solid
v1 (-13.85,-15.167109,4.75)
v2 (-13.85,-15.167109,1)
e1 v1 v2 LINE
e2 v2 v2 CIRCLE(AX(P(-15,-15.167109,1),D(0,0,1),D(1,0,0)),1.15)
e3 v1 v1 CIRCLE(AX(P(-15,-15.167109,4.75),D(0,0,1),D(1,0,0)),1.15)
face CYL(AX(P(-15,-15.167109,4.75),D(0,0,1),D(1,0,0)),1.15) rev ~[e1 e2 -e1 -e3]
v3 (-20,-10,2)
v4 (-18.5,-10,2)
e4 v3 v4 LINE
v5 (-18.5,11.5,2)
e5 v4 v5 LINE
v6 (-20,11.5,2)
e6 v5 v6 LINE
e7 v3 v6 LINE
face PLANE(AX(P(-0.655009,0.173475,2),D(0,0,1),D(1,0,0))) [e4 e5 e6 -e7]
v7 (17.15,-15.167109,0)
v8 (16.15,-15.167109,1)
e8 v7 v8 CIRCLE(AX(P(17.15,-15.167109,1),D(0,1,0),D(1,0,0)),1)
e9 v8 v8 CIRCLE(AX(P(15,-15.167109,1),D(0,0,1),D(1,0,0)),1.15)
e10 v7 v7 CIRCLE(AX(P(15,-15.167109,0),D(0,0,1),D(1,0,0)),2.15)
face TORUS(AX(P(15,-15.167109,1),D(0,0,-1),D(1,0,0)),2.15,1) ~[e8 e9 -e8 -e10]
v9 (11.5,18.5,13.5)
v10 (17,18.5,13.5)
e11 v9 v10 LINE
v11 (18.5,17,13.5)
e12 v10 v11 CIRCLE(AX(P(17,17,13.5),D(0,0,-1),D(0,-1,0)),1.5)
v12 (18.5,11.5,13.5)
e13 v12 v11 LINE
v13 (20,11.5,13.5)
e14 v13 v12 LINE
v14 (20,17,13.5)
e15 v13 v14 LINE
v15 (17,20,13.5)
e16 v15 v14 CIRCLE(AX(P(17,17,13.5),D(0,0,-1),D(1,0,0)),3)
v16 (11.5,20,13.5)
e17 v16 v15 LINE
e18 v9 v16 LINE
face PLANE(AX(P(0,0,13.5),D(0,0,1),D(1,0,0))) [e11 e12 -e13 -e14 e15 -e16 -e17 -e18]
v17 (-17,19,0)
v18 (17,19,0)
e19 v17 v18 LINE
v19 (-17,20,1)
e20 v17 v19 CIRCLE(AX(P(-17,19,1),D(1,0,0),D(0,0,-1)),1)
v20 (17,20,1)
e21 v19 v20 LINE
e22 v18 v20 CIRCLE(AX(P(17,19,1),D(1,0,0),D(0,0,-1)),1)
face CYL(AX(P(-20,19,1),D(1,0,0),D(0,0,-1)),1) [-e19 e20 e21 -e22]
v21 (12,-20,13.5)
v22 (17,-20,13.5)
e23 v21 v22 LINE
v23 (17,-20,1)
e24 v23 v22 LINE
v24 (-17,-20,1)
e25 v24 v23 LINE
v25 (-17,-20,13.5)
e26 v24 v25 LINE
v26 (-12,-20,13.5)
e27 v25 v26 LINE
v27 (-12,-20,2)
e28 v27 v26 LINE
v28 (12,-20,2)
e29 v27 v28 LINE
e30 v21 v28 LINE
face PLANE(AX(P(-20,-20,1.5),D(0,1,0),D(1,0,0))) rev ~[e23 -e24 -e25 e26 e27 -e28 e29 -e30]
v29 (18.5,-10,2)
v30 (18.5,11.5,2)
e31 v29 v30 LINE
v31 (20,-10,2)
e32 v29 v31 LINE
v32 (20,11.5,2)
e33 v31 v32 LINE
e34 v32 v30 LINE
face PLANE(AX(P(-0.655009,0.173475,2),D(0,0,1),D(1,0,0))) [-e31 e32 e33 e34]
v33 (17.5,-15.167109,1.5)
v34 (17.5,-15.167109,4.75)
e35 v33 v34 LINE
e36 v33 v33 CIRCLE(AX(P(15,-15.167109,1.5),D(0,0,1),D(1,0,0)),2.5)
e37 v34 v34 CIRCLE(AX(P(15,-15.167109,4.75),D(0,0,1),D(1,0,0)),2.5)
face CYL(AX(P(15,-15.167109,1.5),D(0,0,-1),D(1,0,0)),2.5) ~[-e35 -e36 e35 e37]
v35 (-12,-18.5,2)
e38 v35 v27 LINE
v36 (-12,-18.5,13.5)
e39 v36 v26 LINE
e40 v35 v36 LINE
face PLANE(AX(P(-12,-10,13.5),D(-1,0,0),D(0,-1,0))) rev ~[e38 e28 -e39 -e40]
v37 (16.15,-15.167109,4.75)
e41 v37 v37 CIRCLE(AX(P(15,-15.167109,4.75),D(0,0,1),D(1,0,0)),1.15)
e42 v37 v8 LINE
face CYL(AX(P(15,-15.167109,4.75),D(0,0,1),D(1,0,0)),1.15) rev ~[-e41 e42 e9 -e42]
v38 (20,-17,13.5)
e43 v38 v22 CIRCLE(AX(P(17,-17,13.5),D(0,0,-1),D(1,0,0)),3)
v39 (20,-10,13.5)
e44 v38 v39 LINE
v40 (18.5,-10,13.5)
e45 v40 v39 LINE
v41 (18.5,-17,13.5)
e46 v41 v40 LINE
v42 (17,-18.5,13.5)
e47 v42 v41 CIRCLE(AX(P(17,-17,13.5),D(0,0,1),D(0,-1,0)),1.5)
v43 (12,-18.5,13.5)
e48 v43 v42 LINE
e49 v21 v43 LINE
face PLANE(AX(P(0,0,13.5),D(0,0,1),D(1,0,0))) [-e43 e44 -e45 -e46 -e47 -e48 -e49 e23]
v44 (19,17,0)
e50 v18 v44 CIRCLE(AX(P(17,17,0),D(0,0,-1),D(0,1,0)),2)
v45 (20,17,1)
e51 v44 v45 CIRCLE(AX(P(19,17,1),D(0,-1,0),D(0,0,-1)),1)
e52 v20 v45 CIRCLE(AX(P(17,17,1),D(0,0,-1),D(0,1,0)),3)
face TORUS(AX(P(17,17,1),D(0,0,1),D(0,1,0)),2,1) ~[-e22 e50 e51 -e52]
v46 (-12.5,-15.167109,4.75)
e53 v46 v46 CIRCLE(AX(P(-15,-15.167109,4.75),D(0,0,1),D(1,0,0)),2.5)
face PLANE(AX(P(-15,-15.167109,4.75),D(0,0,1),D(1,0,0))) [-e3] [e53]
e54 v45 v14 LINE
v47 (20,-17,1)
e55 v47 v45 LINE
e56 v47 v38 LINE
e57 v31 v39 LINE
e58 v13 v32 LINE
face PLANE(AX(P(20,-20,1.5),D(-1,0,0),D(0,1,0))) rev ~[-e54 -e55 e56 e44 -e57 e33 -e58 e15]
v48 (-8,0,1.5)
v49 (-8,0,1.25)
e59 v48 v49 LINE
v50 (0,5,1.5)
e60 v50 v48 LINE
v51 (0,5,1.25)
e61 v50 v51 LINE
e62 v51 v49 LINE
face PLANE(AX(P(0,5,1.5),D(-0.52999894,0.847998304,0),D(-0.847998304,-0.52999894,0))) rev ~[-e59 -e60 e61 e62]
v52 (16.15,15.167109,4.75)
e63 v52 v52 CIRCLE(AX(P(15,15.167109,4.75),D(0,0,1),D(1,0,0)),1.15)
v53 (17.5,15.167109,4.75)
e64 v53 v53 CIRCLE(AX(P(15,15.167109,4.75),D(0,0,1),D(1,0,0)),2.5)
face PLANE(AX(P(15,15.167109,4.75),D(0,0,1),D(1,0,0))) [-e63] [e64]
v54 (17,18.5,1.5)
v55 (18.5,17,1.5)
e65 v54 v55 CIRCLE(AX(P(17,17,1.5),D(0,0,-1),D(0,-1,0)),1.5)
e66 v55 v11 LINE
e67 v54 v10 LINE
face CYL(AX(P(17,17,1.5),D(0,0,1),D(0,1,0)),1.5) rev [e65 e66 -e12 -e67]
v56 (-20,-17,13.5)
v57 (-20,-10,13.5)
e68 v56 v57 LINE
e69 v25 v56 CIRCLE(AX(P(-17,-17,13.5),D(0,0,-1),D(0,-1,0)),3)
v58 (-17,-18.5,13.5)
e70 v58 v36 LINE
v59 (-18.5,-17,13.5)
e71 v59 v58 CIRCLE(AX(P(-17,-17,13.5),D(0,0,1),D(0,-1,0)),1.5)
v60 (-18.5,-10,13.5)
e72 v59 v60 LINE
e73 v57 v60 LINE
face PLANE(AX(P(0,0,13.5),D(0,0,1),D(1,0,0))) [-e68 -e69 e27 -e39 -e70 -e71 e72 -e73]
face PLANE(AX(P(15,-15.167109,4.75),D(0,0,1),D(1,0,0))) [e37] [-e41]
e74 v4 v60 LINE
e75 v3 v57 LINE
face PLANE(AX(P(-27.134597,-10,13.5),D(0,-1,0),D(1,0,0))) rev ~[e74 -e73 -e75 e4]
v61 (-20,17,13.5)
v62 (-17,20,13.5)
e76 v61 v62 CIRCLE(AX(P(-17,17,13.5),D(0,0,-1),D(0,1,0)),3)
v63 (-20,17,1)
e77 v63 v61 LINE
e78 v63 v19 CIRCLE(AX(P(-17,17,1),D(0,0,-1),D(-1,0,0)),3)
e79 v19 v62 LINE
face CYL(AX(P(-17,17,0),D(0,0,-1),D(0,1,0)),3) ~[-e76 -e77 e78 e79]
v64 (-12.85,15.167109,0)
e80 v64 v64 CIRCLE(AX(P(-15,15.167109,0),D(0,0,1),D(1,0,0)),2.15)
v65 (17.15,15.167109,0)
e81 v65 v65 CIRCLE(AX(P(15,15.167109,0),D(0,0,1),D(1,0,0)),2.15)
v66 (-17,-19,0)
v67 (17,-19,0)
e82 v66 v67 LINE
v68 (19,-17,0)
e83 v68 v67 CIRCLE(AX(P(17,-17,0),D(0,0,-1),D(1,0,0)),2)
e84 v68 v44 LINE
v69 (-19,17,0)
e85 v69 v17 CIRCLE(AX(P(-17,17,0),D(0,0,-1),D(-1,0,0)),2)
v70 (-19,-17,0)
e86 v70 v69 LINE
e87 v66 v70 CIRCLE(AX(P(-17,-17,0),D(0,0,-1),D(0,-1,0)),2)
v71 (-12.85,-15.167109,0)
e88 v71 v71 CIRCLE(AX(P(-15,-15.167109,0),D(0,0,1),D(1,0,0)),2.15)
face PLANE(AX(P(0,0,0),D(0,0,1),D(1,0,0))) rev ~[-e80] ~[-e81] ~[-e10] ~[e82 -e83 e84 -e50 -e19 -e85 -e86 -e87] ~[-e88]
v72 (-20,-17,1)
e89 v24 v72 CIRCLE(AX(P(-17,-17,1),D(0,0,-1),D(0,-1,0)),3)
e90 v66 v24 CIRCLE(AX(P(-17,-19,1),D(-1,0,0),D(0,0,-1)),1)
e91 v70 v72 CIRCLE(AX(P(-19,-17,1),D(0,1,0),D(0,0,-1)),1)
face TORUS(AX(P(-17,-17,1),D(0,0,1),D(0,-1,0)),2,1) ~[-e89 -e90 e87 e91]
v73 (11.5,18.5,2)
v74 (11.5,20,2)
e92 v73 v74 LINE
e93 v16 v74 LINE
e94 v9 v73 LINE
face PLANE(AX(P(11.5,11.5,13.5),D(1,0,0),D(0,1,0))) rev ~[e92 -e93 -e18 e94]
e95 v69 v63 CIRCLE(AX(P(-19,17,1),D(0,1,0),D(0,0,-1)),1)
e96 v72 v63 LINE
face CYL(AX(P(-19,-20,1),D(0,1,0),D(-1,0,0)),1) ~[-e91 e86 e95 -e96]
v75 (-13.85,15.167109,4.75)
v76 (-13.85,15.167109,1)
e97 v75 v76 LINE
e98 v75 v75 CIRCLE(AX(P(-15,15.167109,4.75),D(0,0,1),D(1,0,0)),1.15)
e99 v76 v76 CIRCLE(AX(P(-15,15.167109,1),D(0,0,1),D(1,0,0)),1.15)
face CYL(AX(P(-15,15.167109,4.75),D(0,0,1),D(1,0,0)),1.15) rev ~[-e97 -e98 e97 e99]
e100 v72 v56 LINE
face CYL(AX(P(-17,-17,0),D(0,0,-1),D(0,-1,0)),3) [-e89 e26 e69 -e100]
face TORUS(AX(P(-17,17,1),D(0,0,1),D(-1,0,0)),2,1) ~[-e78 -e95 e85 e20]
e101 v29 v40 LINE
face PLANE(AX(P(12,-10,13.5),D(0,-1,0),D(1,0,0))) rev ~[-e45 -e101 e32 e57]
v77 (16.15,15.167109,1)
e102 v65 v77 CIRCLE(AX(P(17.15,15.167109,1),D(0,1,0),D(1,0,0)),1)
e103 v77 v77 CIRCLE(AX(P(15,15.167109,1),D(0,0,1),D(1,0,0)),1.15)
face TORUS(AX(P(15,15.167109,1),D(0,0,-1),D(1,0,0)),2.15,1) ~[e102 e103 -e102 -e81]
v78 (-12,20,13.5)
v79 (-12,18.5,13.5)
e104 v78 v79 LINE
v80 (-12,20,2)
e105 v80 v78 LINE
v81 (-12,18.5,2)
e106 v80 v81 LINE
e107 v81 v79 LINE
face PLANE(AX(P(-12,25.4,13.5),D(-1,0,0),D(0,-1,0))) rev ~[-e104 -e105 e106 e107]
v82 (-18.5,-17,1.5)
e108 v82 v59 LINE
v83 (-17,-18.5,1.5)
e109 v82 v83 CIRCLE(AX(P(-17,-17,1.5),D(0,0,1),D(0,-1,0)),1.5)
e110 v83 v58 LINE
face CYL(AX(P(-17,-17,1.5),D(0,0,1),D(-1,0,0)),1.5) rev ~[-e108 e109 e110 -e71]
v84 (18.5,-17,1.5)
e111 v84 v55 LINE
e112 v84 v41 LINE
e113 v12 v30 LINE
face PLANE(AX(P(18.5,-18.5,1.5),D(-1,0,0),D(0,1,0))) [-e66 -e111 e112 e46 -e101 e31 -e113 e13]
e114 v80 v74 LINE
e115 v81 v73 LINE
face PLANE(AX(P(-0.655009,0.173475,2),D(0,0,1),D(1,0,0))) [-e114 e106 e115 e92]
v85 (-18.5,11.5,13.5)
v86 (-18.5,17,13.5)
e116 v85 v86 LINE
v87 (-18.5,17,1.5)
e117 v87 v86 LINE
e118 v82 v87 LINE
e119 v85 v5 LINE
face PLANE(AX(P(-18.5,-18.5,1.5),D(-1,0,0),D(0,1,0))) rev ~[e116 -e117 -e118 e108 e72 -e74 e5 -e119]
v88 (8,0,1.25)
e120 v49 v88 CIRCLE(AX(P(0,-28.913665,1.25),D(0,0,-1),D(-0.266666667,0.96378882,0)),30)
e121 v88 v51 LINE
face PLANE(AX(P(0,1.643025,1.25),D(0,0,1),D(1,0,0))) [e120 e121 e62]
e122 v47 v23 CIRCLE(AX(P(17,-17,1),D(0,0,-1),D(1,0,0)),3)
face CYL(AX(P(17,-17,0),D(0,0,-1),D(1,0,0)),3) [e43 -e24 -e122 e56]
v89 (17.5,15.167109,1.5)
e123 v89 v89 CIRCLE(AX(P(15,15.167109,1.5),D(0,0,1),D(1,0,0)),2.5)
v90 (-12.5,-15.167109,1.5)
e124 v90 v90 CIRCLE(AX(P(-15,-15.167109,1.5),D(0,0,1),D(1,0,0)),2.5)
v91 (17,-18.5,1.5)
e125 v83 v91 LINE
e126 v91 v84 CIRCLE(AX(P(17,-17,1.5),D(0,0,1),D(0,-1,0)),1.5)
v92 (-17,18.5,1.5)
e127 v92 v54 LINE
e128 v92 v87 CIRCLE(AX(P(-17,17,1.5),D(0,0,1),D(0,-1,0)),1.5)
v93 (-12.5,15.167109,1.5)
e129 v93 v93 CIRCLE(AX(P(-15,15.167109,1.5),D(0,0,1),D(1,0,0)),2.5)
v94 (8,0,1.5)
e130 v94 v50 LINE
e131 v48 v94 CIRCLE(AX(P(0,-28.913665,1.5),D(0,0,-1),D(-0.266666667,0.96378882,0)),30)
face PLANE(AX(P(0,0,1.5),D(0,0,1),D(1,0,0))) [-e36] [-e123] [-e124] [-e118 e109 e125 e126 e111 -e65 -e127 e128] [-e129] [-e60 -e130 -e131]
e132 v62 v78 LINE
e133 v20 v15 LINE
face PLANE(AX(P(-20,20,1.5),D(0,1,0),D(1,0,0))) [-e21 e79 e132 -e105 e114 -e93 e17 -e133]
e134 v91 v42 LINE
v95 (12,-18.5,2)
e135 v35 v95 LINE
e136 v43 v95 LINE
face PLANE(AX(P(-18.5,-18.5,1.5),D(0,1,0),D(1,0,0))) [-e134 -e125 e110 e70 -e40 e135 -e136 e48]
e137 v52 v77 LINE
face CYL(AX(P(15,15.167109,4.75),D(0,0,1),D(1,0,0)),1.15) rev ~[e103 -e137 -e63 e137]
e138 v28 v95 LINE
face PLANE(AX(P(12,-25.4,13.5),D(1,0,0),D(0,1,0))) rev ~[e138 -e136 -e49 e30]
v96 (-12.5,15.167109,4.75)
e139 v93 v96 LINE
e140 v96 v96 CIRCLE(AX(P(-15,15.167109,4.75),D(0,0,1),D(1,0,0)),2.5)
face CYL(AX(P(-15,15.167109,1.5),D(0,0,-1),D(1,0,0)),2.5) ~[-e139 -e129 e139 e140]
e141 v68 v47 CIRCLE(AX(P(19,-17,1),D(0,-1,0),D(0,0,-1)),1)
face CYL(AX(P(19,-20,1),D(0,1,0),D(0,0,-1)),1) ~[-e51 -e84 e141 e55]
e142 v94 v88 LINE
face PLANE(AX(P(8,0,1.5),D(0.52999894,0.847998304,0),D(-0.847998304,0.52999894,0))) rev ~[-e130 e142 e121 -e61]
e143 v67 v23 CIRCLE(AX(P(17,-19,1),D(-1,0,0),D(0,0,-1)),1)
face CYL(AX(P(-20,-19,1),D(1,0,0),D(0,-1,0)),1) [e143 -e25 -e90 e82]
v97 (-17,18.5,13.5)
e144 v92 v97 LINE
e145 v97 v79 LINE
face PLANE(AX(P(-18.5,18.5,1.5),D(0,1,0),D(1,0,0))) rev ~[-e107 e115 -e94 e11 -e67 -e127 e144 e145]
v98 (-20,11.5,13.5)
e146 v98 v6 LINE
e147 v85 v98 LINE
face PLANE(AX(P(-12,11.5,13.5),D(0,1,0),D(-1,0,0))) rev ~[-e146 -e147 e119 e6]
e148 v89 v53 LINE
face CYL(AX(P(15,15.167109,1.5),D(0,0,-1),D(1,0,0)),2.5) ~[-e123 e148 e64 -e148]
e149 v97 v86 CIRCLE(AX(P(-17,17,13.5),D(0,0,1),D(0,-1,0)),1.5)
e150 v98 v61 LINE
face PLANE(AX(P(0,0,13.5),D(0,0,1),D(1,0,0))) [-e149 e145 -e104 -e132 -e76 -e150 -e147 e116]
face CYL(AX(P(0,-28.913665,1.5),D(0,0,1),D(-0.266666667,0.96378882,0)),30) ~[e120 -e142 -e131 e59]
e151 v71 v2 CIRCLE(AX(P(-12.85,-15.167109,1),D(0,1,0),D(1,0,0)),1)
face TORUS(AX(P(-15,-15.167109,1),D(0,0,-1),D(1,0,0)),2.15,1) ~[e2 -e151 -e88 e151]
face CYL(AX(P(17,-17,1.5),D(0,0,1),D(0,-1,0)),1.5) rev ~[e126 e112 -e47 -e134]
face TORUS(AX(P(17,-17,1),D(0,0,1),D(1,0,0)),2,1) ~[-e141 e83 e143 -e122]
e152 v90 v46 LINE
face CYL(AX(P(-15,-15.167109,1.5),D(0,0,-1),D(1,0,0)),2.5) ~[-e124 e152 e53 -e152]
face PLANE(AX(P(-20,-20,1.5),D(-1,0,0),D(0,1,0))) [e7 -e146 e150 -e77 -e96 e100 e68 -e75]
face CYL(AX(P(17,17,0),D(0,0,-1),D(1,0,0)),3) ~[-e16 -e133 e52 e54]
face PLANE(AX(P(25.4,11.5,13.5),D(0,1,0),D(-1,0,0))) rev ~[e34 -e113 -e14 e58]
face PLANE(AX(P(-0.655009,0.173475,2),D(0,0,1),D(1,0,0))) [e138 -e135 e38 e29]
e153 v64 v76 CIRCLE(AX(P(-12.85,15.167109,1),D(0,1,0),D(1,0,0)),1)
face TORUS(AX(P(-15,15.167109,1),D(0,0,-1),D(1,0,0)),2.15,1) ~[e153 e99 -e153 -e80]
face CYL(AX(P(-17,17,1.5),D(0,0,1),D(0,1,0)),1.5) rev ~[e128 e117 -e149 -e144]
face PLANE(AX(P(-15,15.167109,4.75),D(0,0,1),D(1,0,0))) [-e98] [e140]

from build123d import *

# Parameters (mm, degrees)
F0_W          = 40
F0_H          = 40
F1_DEPTH      = 1.5
F2_W          = 40
F2_H          = 40
F2_W_2        = 37
F2_H_2        = 37
F3_DEPTH      = 12
F4_R          = 2.5
F5_DEPTH      = 3.25
F6_R          = 1.15
F7_DEPTH      = 4.751
F9_DEPTH      = 11.5
F11_DEPTH     = 0.25
F12_R         = 1
F13_T1_DEPTH  = 21
F13_T4_ANGLE  = 90
F13_T6_ANGLE  = 90
F13_T8_ANGLE  = 90
F13_T10_ANGLE = 90
F14_R         = 1.5


# Not quite as in the source:
# - a fillet or chamfer that OpenCascade refuses, or shapes differently, is made with other operations: its cross-section is extruded or revolved along the edge and cut away or added


with BuildPart() as f1:
    # F0 (on Top) → F1 (new body)
    with BuildSketch(Plane.XY):
        Rectangle(F0_W, F0_H)
    extrude(amount=F1_DEPTH)

    # F2 (on face) → F3 (join)
    with BuildSketch(Plane.XY.offset(1.5)):
        Rectangle(F2_W, F2_H)
        Rectangle(F2_W_2, F2_H_2, mode=Mode.SUBTRACT)
    extrude(amount=F3_DEPTH)

    # F4 (on face) → F5 (join)
    with BuildSketch(Plane.XY.offset(1.5)):
        with Locations((-15, 15.1671093126)):
            Circle(F4_R)
        with Locations((15, 15.1671093126)):
            Circle(F4_R)
        with Locations((15, -15.1671093126)):
            Circle(F4_R)
        with Locations((-15, -15.1671093126)):
            Circle(F4_R)
    extrude(amount=F5_DEPTH)

    # F6 (on face) → F7 (cut, through all)
    with BuildSketch(Plane.XY.offset(4.75)):
        with Locations((-15, 15.1671093126)):
            Circle(F6_R)
        with Locations((15, 15.1671093126)):
            Circle(F6_R)
        with Locations((-15, -15.1671093126)):
            Circle(F6_R)
        with Locations((15, -15.1671093126)):
            Circle(F6_R)
    extrude(amount=-F7_DEPTH, mode=Mode.SUBTRACT)

    # F8 (on face) → F9 (cut)
    with BuildSketch(Plane.XY.offset(13.5)):
        Polygon((11.5, 25.4), (-12, 25.4), (-12, 11.5), (-27.1345967194, 11.5), (-27.1345967194, -10), (-12, -10), (-12, -25.4), (12, -25.4), (12, -10), (25.4, -10), (25.4, 11.5), (11.5, 11.5), align=None)
    extrude(amount=-F9_DEPTH, mode=Mode.SUBTRACT)

    # F10 (on face) → F11 (cut)
    with BuildSketch(Plane.XY.offset(1.5)):
        with BuildLine():
            Line((8, 0), (0, 5))
            Line((0, 5), (-8, 0))
            ThreePointArc((-8, 0), (0, 1.0863354104), (8, 0))
        make_face()
    extrude(amount=-F11_DEPTH, mode=Mode.SUBTRACT)

    # F12
    f12_edges = [f1.edges().sort_by_distance(p)[0] for p in [
        (20, 0, 0),
        (0, -20, 0),
        (0, 20, 0),
        (-20, 0, 0),
        (-16.15, -15.167109, 0),
        (13.85, -15.167109, 0),
        (-16.15, 15.167109, 0),
        (13.85, 15.167109, 0),
    ]]
    fillet(f12_edges, radius=F12_R)

    # F13: fillet of radius 3 on 4 edges, made by hand

    # F13_s2 → F13_t1 (cut)
    with BuildSketch(Plane.XY):
        with BuildLine():
            ThreePointArc((20, -17), (19.1213203436, -19.1213203436), (17, -20))
            Line((17, -20), (20, -20))
            Line((20, -20), (20, -17))
        make_face()
        with BuildLine():
            ThreePointArc((20, 17), (19.1213203436, 19.1213203436), (17, 20))
            Line((17, 20), (20, 20))
            Line((20, 20), (20, 17))
        make_face()
        with BuildLine():
            ThreePointArc((-17, 20), (-19.1213203436, 19.1213203436), (-20, 17))
            Line((-20, 17), (-20, 20))
            Line((-20, 20), (-17, 20))
        make_face()
        with BuildLine():
            ThreePointArc((-17, -20), (-19.1213203436, -19.1213203436), (-20, -17))
            Line((-20, -17), (-20, -20))
            Line((-20, -20), (-17, -20))
        make_face()
    extrude(amount=F13_T1_DEPTH, mode=Mode.SUBTRACT)

    # F13_s3 → F13_t4 (revolve, cut)
    with BuildSketch(Plane.YZ.offset(-17)):
        with BuildLine():
            ThreePointArc((-19, 0), (-19.7071067812, 0.2928932188), (-20, 1))
            Line((-20, 1), (-20, 0))
            Line((-20, 0), (-19, 0))
        make_face()
    revolve(axis=Axis((-17, -17, 0), (0, 0, -1)), revolution_arc=F13_T4_ANGLE, mode=Mode.SUBTRACT)

    # F13_s5 → F13_t6 (revolve, cut)
    with BuildSketch(Plane.XZ.offset(-17)):
        with BuildLine():
            ThreePointArc((-19, 0), (-19.7071067812, 0.2928932188), (-20, 1))
            Line((-20, 1), (-20, 0))
            Line((-20, 0), (-19, 0))
        make_face()
    revolve(axis=Axis((-17, 17, 0), (0, 0, -1)), revolution_arc=F13_T6_ANGLE, mode=Mode.SUBTRACT)

    # F13_s7 → F13_t8 (revolve, cut)
    with BuildSketch(Plane.YZ.offset(17)):
        with BuildLine():
            ThreePointArc((19, 0), (19.7071067812, 0.2928932188), (20, 1))
            Line((20, 1), (20, 0))
            Line((20, 0), (19, 0))
        make_face()
    revolve(axis=Axis((17, 17, 0), (0, 0, -1)), revolution_arc=F13_T8_ANGLE, mode=Mode.SUBTRACT)

    # F13_s9 → F13_t10 (revolve, cut)
    with BuildSketch(Plane.XZ.offset(17)):
        with BuildLine():
            ThreePointArc((19, 0), (19.7071067812, 0.2928932188), (20, 1))
            Line((20, 1), (20, 0))
            Line((20, 0), (19, 0))
        make_face()
    revolve(axis=Axis((17, -17, 0), (0, 0, -1)), revolution_arc=F13_T10_ANGLE, mode=Mode.SUBTRACT)

    # F14
    f14_edges = [f1.edges().sort_by_distance(p)[0] for p in [
        (-18.5, 18.5, 7.5),
        (18.5, 18.5, 7.5),
        (-18.5, -18.5, 7.5),
        (18.5, -18.5, 7.5),
    ]]
    fillet(f14_edges, radius=F14_R)


solid = f1.part
